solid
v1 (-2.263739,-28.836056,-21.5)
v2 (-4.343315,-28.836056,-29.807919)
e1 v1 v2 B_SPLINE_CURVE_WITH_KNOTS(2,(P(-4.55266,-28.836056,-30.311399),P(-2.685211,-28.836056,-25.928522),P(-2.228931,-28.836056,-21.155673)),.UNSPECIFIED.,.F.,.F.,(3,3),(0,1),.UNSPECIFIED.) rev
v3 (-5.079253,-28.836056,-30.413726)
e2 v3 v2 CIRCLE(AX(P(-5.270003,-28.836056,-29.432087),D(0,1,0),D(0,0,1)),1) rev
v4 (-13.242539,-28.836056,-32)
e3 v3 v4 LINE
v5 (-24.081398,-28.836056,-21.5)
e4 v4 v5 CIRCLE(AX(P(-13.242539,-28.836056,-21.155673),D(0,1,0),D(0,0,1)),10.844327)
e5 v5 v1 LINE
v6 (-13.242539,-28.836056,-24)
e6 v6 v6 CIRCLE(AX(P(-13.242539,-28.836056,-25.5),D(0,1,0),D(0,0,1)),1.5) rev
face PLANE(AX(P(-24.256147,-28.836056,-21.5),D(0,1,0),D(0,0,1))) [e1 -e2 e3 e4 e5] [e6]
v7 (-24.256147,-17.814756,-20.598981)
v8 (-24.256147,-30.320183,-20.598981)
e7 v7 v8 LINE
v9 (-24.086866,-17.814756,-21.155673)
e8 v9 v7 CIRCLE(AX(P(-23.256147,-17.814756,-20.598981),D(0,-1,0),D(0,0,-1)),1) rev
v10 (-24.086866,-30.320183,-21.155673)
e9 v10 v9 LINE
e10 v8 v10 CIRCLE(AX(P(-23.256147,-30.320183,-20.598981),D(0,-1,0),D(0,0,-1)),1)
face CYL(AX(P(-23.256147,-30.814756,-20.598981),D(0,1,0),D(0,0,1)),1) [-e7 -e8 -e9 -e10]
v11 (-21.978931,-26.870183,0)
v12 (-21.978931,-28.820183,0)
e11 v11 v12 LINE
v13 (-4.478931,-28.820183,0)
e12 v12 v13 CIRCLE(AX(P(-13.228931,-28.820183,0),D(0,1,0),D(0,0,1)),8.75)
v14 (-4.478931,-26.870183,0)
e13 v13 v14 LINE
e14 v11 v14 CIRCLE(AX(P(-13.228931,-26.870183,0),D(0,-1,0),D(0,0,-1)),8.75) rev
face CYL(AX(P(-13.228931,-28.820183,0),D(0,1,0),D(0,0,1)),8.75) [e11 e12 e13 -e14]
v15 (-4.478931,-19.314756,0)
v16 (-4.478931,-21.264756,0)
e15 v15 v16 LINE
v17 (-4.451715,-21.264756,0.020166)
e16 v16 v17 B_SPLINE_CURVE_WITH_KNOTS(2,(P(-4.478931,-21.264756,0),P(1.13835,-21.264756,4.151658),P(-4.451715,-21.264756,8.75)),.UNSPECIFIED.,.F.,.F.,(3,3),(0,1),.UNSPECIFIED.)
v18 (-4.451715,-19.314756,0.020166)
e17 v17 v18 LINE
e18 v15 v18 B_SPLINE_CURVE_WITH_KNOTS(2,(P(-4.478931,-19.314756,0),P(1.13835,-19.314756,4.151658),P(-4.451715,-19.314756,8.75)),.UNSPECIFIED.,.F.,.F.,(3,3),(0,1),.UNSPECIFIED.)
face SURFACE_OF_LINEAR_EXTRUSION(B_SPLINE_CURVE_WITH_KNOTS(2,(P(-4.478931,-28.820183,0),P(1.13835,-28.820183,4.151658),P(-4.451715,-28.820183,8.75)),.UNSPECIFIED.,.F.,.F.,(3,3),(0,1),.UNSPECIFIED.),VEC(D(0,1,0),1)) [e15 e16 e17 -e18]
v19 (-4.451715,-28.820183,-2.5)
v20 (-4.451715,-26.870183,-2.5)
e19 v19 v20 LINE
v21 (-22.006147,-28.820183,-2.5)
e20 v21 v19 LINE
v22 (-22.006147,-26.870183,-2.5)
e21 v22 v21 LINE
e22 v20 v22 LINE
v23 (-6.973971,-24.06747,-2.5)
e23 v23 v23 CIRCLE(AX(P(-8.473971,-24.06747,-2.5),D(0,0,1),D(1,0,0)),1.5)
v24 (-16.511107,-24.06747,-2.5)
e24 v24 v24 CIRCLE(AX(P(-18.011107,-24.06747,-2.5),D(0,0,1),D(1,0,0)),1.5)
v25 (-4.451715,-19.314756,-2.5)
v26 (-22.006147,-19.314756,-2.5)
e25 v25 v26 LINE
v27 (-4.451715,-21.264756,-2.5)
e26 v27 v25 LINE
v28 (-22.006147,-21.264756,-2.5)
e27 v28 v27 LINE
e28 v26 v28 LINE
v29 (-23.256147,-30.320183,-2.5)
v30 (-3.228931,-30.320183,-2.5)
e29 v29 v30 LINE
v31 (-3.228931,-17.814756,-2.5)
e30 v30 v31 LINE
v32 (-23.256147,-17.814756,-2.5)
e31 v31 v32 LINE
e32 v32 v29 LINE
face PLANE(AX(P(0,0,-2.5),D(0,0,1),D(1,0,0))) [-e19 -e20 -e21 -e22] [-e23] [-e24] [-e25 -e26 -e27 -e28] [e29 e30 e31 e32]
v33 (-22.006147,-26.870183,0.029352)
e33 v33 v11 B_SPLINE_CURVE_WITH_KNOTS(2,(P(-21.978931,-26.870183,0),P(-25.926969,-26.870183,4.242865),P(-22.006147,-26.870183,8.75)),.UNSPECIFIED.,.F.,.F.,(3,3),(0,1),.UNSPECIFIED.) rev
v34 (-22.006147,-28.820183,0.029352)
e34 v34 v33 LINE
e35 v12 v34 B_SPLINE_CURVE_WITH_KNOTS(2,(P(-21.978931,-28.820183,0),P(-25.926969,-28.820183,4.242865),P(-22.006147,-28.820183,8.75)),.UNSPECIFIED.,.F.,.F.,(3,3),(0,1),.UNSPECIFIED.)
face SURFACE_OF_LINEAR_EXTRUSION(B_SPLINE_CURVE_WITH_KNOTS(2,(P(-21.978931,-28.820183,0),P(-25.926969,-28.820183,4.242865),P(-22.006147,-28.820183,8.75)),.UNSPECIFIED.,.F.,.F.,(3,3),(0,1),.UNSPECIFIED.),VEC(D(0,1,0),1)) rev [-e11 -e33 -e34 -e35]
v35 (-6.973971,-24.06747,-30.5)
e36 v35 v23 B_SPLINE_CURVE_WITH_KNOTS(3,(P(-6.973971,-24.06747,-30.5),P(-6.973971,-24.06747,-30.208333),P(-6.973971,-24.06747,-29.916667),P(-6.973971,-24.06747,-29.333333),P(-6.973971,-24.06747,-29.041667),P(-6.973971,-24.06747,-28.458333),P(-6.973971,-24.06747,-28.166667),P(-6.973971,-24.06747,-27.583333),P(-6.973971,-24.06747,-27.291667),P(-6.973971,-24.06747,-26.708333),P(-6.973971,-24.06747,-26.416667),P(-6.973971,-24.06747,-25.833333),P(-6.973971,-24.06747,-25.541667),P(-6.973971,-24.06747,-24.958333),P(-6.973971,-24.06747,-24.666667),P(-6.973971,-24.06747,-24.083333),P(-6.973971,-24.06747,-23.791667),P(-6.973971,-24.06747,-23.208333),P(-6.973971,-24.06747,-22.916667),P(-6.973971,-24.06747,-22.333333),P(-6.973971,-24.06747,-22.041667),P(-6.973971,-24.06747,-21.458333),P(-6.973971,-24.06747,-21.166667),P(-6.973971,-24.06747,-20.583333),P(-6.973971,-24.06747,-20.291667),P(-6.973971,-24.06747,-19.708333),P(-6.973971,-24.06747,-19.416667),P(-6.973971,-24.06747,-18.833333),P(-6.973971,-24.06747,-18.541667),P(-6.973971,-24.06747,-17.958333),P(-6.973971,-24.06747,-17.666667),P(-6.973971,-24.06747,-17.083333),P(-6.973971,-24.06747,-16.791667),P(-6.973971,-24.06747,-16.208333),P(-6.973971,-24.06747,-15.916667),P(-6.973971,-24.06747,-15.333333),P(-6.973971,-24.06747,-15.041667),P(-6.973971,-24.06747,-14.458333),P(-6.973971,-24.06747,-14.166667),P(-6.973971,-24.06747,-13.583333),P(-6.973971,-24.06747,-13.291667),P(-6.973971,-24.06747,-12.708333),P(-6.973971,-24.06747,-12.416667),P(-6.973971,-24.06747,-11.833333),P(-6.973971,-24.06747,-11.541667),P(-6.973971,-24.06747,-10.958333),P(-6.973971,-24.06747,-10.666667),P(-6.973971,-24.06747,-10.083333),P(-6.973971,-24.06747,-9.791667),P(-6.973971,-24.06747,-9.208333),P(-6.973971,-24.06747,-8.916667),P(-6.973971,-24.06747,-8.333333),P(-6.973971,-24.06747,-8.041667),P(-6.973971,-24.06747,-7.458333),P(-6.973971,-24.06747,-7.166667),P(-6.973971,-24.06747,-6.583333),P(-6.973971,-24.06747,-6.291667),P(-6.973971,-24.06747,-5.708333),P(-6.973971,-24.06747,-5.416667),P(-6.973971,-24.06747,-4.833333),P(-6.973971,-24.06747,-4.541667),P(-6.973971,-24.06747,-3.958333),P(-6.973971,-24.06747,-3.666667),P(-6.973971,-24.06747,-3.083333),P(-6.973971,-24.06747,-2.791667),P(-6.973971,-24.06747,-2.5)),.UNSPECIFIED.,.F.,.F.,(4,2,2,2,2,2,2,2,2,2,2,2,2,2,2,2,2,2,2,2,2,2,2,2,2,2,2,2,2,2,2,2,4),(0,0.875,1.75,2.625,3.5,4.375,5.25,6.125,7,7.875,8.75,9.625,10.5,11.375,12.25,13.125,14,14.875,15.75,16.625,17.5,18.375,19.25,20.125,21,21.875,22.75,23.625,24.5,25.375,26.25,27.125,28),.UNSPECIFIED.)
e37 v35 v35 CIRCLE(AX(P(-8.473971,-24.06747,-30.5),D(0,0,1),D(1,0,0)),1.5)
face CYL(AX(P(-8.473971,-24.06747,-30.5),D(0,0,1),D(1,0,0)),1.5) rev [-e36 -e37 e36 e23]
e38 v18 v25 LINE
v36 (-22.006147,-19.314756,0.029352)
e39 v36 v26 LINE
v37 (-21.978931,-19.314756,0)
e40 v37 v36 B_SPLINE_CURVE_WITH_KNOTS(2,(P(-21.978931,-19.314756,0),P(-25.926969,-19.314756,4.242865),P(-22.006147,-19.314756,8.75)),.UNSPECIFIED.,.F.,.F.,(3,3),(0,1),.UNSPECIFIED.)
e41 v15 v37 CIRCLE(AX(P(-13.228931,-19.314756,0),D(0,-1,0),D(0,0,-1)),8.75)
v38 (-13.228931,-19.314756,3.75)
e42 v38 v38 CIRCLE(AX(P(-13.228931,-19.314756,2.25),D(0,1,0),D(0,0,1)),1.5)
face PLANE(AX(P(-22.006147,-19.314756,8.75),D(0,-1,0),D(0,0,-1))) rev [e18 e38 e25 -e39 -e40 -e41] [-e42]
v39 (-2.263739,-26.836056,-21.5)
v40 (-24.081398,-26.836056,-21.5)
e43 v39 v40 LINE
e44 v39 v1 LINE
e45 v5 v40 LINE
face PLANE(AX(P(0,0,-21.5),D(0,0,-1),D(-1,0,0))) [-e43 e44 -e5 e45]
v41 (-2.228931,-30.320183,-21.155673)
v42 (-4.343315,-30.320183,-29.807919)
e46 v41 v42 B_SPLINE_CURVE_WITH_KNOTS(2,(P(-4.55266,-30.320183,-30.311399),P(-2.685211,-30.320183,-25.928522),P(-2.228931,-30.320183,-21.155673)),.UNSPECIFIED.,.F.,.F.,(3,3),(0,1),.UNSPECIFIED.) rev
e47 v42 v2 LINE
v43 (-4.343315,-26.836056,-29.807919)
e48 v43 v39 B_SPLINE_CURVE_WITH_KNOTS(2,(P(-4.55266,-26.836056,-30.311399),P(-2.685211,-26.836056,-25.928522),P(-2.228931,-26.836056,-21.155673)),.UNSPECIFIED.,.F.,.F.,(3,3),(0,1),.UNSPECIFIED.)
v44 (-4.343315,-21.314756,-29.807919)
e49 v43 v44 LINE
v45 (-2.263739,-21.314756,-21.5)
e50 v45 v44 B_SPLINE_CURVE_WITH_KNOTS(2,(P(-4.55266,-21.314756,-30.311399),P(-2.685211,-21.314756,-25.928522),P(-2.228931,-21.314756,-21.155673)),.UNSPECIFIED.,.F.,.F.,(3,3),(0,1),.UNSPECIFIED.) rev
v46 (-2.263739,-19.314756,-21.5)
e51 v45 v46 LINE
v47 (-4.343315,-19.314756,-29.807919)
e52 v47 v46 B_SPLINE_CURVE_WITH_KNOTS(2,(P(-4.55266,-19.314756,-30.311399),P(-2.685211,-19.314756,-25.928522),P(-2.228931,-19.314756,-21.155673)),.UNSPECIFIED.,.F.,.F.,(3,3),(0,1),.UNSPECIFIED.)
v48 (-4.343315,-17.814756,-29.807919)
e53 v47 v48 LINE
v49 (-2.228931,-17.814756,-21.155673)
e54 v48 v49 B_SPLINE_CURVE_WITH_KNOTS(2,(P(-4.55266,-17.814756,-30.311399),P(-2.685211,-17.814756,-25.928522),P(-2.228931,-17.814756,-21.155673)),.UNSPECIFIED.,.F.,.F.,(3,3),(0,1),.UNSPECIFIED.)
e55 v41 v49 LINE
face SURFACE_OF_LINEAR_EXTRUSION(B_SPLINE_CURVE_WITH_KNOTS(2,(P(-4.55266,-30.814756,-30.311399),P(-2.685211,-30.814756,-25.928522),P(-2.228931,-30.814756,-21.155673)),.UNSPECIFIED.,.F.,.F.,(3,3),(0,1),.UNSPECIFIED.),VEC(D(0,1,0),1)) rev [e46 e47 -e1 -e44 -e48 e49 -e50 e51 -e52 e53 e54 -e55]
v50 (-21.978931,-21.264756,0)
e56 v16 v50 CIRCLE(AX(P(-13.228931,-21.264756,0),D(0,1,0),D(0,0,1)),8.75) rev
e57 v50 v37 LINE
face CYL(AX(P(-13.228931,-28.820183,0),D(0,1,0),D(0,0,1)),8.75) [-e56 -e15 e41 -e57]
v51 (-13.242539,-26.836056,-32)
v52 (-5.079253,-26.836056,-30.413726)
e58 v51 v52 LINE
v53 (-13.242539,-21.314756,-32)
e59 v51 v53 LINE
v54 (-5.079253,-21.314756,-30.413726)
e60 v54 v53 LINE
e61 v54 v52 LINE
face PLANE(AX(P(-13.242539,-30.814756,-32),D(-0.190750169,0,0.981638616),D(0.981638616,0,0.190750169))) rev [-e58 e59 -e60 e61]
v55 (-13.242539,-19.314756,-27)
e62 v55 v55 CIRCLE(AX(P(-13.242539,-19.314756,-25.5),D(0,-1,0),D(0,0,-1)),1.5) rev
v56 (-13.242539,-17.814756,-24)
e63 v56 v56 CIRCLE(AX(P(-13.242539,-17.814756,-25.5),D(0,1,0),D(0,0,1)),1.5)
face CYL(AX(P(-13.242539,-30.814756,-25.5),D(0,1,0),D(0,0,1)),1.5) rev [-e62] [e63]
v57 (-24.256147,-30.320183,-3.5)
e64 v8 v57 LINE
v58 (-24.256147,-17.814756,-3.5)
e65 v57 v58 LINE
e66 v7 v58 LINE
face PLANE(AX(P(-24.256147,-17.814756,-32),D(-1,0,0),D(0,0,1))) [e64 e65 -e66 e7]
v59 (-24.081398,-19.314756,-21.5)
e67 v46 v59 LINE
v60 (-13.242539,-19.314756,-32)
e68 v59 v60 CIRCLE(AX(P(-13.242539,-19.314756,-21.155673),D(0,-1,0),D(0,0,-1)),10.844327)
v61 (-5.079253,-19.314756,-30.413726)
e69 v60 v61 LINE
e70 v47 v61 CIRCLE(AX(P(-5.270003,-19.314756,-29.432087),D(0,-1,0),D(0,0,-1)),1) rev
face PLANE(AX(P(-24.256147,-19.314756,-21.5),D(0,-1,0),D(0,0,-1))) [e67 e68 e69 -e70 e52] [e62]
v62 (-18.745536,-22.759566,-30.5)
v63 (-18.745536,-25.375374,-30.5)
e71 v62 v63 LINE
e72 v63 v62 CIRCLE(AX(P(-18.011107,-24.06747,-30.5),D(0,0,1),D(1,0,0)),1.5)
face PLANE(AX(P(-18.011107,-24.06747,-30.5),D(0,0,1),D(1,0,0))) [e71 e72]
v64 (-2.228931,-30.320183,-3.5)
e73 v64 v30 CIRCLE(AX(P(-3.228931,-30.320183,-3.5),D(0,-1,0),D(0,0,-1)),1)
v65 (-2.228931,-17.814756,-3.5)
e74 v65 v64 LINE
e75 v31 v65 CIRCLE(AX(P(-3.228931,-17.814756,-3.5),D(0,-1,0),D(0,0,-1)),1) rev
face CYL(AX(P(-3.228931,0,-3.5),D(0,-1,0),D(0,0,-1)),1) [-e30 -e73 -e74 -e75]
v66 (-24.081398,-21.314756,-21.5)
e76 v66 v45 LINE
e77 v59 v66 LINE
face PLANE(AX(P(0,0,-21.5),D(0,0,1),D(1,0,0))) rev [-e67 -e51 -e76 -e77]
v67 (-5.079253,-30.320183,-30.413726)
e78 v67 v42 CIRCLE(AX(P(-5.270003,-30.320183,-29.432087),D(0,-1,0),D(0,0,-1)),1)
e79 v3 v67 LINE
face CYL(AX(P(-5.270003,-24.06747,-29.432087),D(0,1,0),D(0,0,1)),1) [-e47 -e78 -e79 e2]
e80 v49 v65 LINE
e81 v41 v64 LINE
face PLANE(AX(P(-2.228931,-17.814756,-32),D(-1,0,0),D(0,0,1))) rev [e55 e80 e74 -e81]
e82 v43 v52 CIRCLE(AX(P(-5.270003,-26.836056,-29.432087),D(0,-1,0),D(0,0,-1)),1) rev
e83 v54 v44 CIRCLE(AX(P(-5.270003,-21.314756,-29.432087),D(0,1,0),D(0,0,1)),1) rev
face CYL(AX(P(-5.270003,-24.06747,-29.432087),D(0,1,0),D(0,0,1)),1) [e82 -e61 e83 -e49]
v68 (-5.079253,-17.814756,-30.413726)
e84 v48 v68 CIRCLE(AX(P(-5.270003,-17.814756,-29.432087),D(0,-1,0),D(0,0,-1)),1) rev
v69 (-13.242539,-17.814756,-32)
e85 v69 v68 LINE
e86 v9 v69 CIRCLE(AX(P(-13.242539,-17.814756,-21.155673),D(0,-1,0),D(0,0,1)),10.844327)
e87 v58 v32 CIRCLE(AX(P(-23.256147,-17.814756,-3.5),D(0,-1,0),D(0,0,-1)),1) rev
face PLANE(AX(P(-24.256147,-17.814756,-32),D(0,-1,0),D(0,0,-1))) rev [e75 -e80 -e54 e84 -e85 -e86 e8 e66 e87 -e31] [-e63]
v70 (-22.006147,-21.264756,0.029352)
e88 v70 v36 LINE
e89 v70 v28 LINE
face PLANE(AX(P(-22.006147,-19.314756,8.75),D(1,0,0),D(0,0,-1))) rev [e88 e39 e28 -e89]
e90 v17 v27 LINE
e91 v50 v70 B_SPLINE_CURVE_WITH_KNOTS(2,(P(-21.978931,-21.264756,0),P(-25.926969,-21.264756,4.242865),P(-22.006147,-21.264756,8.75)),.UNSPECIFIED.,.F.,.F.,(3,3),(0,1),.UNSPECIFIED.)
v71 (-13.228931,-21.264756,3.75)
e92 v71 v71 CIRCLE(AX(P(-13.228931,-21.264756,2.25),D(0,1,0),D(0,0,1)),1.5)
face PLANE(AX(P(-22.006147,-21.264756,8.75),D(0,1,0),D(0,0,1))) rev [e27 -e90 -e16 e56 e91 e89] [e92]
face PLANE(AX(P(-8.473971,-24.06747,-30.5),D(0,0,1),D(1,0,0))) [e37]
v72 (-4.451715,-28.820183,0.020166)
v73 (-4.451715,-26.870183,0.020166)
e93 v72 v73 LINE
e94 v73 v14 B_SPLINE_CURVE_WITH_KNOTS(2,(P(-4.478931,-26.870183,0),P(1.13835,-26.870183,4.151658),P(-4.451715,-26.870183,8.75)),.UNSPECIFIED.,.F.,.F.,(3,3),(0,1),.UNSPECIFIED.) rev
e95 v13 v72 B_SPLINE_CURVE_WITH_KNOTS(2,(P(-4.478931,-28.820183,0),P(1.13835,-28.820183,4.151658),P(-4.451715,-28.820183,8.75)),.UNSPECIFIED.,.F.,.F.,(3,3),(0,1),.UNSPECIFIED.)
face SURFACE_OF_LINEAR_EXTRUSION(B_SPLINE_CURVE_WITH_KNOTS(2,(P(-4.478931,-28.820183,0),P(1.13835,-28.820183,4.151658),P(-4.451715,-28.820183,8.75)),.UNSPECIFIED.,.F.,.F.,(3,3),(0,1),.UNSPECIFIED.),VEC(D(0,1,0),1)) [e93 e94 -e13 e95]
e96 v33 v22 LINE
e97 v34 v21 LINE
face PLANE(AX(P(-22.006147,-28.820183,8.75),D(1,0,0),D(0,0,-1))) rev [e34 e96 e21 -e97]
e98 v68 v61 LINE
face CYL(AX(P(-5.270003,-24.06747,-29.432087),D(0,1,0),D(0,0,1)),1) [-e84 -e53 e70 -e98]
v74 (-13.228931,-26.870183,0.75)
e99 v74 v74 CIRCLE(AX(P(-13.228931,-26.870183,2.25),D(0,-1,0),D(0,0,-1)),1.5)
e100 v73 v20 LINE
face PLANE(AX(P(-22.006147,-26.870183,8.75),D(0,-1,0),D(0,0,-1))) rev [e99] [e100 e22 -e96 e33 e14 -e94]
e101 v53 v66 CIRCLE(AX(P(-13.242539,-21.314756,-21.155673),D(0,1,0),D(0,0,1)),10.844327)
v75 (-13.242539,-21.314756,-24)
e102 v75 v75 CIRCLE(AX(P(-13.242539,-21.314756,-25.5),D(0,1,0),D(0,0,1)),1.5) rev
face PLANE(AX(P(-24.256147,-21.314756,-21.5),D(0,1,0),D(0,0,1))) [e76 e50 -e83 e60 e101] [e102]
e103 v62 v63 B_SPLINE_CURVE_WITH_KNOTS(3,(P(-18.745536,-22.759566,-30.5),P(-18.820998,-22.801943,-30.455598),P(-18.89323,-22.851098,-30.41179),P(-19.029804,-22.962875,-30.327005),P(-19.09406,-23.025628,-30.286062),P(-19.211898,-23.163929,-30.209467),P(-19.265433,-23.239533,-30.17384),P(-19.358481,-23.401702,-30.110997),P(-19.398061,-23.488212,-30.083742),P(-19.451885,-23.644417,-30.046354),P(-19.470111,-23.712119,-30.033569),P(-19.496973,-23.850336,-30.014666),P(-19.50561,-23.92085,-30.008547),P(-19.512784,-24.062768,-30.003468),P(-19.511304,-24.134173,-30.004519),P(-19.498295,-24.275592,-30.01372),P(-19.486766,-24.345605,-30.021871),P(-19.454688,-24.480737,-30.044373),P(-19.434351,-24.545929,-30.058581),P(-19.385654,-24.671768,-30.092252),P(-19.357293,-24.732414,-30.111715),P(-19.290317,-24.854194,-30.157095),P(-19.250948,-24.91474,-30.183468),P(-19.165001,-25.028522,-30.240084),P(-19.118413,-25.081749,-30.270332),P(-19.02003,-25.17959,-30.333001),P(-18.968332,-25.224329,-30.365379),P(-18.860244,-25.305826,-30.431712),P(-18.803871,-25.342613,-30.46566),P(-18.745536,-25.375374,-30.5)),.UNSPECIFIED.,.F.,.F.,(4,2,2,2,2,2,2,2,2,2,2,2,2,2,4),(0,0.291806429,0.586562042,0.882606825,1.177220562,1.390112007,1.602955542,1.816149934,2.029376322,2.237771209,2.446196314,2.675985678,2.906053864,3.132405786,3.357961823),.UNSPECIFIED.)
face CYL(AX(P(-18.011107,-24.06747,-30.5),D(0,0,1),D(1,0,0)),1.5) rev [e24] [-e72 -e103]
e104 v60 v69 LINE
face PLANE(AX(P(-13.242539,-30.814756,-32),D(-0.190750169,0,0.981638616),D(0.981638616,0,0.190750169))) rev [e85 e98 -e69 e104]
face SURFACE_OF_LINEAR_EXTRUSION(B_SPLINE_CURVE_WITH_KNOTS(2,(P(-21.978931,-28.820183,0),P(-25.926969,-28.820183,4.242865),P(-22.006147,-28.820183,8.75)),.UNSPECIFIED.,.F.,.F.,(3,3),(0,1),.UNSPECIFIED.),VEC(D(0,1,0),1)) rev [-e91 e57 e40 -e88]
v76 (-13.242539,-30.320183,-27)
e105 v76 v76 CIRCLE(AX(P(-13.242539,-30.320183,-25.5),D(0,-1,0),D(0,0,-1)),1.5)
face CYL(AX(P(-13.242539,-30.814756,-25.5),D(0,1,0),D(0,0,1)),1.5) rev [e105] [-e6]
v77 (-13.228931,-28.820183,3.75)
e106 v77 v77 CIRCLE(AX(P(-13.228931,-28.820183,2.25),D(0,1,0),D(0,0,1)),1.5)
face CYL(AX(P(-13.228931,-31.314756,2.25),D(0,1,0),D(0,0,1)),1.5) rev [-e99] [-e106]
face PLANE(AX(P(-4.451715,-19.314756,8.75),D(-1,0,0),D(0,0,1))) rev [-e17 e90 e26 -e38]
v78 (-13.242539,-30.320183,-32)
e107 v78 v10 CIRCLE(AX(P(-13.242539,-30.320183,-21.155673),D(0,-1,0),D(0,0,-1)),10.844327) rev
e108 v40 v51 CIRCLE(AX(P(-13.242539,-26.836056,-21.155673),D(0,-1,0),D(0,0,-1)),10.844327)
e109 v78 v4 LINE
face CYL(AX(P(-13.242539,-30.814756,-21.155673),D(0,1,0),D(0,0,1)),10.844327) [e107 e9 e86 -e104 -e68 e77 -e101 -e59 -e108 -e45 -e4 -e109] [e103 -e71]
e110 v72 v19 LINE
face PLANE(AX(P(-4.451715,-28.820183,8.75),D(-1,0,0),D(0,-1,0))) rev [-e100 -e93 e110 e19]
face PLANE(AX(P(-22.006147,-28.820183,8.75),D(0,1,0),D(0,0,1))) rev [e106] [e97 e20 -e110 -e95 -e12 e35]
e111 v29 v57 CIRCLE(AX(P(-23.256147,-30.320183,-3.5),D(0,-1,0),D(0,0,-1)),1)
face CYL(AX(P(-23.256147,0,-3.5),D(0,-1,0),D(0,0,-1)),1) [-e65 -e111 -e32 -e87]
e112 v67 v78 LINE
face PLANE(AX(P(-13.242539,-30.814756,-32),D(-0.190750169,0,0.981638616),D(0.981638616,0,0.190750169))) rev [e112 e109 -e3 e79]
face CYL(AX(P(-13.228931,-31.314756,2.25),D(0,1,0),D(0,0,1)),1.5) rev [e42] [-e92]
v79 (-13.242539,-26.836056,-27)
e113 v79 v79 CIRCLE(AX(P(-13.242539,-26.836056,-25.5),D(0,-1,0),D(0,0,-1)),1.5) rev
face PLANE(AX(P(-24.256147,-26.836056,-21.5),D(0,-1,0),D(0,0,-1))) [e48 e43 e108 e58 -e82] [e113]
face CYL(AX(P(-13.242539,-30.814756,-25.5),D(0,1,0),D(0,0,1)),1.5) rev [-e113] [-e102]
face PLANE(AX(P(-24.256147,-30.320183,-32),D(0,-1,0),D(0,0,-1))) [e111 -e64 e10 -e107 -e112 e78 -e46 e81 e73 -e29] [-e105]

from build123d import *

# Parameters (mm, degrees)
SKETCH2_W             = 17.554431489
SKETCH2_H             = 1.95
BOSS_EXTRUDE1_DEPTH   = 8.75
BOSS_EXTRUDE1_2_DEPTH = 8.75
CUT_EXTRUDE1_DEPTH    = 26.518349076
SKETCH4_W             = 22.027215745
SKETCH4_H             = 12.505427167
BOSS_EXTRUDE2_DEPTH   = 32
SKETCH5_R             = 1.5
CUT_EXTRUDE2_DEPTH    = 12
SKETCH6_W             = 22.027215745
SKETCH6_H             = 12.505427167
SKETCH6_W_2           = 17.554431489
SKETCH6_H_2           = 1.95
CUT_EXTRUDE3_DEPTH    = 2.5
SKETCH7_R             = 1.5
CUT_EXTRUDE4_DEPTH    = 13
SKETCH8_R             = 1.5
CUT_EXTRUDE5_DEPTH    = 28
FILLET3_R             = 1
SKETCH9_W             = 22.02721574
SKETCH9_H             = 2
CUT_EXTRUDE6_DEPTH    = 11


with BuildPart() as part:
    # Sketch2 → Boss-Extrude1 (new body)
    with BuildSketch(Plane.XY):
        with Locations((-13.228930986, -27.845183414)):
            Rectangle(SKETCH2_W, SKETCH2_H)
    extrude(amount=BOSS_EXTRUDE1_DEPTH)


with BuildPart() as body_2:
    # Sketch2 → Boss-Extrude1 2 (new body)
    with BuildSketch(Plane.XY):
        with Locations((-13.228930986, -20.289756247)):
            Rectangle(SKETCH2_W, SKETCH2_H)
    extrude(amount=BOSS_EXTRUDE1_2_DEPTH)


with BuildPart() as cut_extrude1_tool:
    # Sketch3 → Cut-Extrude1 (new, through all)
    with BuildSketch(Plane(origin=(0, -19.314756247, 0), x_dir=(1, 0, 0), z_dir=(0, 1, 0))):
        with BuildLine():
            ThreePointArc((-13.228930986, -8.75), (-7.041746651, -6.187184335), (-4.478930986, 0))
            add(Edge.make_bspline(
                [(-4.478930986, 0), (1.138349918, -4.151657709), (-4.451715242, -8.75)],
                knots=[0, 0, 0, 1, 1, 1], degree=2))
            add(Edge.make_bspline(
                [(-22.006146731, -8.75), (-13.228930986, -12.473510392), (-4.451715242, -8.75)],
                knots=[0, 0, 0, 1, 1, 1], degree=2))
            add(Edge.make_bspline(
                [(-21.978930986, 0), (-25.926969228, -4.242865138), (-22.006146731, -8.75)],
                knots=[0, 0, 0, 1, 1, 1], degree=2))
            ThreePointArc((-21.978930986, 0), (-19.416115322, -6.187184335), (-13.228930986, -8.75))
        make_face()
    extrude(amount=-CUT_EXTRUDE1_DEPTH)


with BuildPart() as part_1:
    add(part.part)

    # Cut-Extrude1: cut by cut_extrude1_tool
    add(cut_extrude1_tool.part, mode=Mode.SUBTRACT)



with BuildPart() as body_2_1:
    add(body_2.part)

    # Cut-Extrude1: cut by cut_extrude1_tool
    add(cut_extrude1_tool.part, mode=Mode.SUBTRACT)


with BuildPart() as part_2:
    add(part_1.part)

    add(body_2_1.part)  # Boss-Extrude2 merges body 2
    # Sketch4 → Boss-Extrude2 (add)
    with BuildSketch(Plane(origin=(0, 0, 0), x_dir=(-1, 0, 0), z_dir=(0, 0, -1))):
        with Locations((13.242538859, -24.067469831)):
            Rectangle(SKETCH4_W, SKETCH4_H)
    extrude(amount=BOSS_EXTRUDE2_DEPTH)

    # Sketch5 → Cut-Extrude2 (cut)
    with BuildSketch(Plane(origin=(0, -19.314756247, 0), x_dir=(1, 0, 0), z_dir=(0, 1, 0))):
        with Locations(Location((-13.228930986, -2.25, 0), (0, 0, 270))):
            Circle(SKETCH5_R)
    extrude(amount=-CUT_EXTRUDE2_DEPTH, mode=Mode.SUBTRACT)

    # Sketch6 → Cut-Extrude3 (cut)
    with BuildSketch(Plane.XY):
        with Locations((-13.242538859, -24.067469831)):
            Rectangle(SKETCH6_W, SKETCH6_H)
        with Locations((-13.228930986, -27.845183414)):
            Rectangle(SKETCH6_W_2, SKETCH6_H_2, mode=Mode.SUBTRACT)
        with Locations((-13.228930986, -20.289756247)):
            Rectangle(SKETCH6_W_2, SKETCH6_H_2, mode=Mode.SUBTRACT)
    extrude(amount=-CUT_EXTRUDE3_DEPTH, mode=Mode.SUBTRACT)

    # Sketch7 → Cut-Extrude4 (cut)
    with BuildSketch(Plane(origin=(0, -17.814756247, 0), x_dir=(1, 0, 0), z_dir=(0, 1, 0))):
        with Locations(Location((-13.242538859, 25.5, 0), (0, 0, 270))):
            Circle(SKETCH7_R)
        with BuildLine():
            Line((-24.086865874, 21.155672985), (-24.256146731, 21.155672985))
            add(Edge.make_bspline(
                [(-2.228930986, 21.155672985), (11.471530889, 27.189710441), (-11.765166974, 53.431279988), (-37.007876173, 21.523583672), (-24.256146731, 21.155672985)],
                knots=[0, 0, 0, 0, 0.52011282, 1, 1, 1, 1], degree=3))
            add(Edge.make_bspline(
                [(-4.552660132, 30.311399113), (-2.685211009, 25.928521854), (-2.228930986, 21.155672985)],
                knots=[0, 0, 0, 1, 1, 1], degree=2))
            Line((-4.552660132, 30.311399113), (-13.242538859, 32))
            ThreePointArc((-13.242538859, 32), (-20.910636028, 28.823770155), (-24.086865874, 21.155672985))
        make_face()
    extrude(amount=-CUT_EXTRUDE4_DEPTH, mode=Mode.SUBTRACT)

    # Sketch8 → Cut-Extrude5 (cut)
    with BuildSketch(Plane.XY.offset(-2.5)):
        with Locations((-18.011106811, -24.06746983)):
            Circle(SKETCH8_R)
        with Locations((-8.473970906, -24.06746983)):
            Circle(SKETCH8_R)
    extrude(amount=-CUT_EXTRUDE5_DEPTH, mode=Mode.SUBTRACT)

    # Fillet3
    # the kernel refuses this fillet: 1 mm, written as the material it takes off along each edge
    with BuildSketch(Plane(origin=(-24.256146731, -15.314756247, -2.5), x_dir=(0, 0, -1), z_dir=(0, -1, 0)), Plane(origin=(-2.228930986, -32.820183414, -2.5), x_dir=(0, 0, -1), z_dir=(0, 1, 0))) as fillet3_piece_1:
        with BuildLine():
            CenterArc((FILLET3_R, FILLET3_R), FILLET3_R, 180, 90)
            Line((0, FILLET3_R), (-FILLET3_R * 0.02, FILLET3_R))
            Line((-FILLET3_R * 0.02, FILLET3_R), (-FILLET3_R * 0.02, -FILLET3_R * 0.02))
            Line((-FILLET3_R * 0.02, -FILLET3_R * 0.02), (FILLET3_R, -FILLET3_R * 0.02))
            Line((FILLET3_R, -FILLET3_R * 0.02), (FILLET3_R, 0))
        make_face()
    extrude(amount=17.505427167, mode=Mode.SUBTRACT)
    with BuildSketch(Plane(origin=(-24.256146731, -16.423026869, -21.155672985), x_dir=(1.0, 0, 2.5394386720559264e-12), z_dir=(0, -1, 0))) as fillet3_piece_2:
        with BuildLine():
            CenterArc((1, 0.556691751), FILLET3_R, 180, 33.827317624)
            Line((0, 0.556691751), (-0.02, 0.556691751))
            Line((-0.02, 0.556691751), (-0.02, 0))
            Line((-0.02, 0), (0, -0.02))
            ThreePointArc((0, -0.02), (0.084640429, -0.02), (0.152666474, -0.011133835))
            Line((0.152666474, -0.011133835), (0.169280857, 0))
        make_face()
    extrude(amount=15.288885922, mode=Mode.SUBTRACT)
    with BuildSketch(Plane(origin=(-4.552660132, -16.451585564, -30.311399113), x_dir=(0.3839298520349852, 0, 0.9233622629912891), z_dir=(0, -1, 0))) as fillet3_piece_3:
        with BuildLine():
            CenterArc((0.536514164, 0.999961682), FILLET3_R, 213.573886674, 56.927693277)
            Line((-0.296659206, 0.446949805), (-0.313322674, 0.435889568))
            Line((-0.313322674, 0.435889568), (-0.016663467, -0.011060238))
            Line((-0.016663467, -0.011060238), (-0.0001747, -0.019999237))
            ThreePointArc((-0.0001747, -0.019999237), (0.272634035, -0.021192075), (0.545443356, -0.019999234))
            Line((0.545443356, -0.019999234), (0.545268273, 0))
        make_face()
    extrude(amount=15.231768533, mode=Mode.SUBTRACT)

    # Sketch9 → Cut-Extrude6 (cut)
    with BuildSketch(Plane.XY.offset(-32.5)):
        with Locations((-13.24253886, -20.31475625)):
            Rectangle(SKETCH9_W, SKETCH9_H)
        with Locations((-13.24253886, -27.836055834)):
            Rectangle(SKETCH9_W, SKETCH9_H)
    extrude(amount=CUT_EXTRUDE6_DEPTH, mode=Mode.SUBTRACT)


solid = part_2.part
